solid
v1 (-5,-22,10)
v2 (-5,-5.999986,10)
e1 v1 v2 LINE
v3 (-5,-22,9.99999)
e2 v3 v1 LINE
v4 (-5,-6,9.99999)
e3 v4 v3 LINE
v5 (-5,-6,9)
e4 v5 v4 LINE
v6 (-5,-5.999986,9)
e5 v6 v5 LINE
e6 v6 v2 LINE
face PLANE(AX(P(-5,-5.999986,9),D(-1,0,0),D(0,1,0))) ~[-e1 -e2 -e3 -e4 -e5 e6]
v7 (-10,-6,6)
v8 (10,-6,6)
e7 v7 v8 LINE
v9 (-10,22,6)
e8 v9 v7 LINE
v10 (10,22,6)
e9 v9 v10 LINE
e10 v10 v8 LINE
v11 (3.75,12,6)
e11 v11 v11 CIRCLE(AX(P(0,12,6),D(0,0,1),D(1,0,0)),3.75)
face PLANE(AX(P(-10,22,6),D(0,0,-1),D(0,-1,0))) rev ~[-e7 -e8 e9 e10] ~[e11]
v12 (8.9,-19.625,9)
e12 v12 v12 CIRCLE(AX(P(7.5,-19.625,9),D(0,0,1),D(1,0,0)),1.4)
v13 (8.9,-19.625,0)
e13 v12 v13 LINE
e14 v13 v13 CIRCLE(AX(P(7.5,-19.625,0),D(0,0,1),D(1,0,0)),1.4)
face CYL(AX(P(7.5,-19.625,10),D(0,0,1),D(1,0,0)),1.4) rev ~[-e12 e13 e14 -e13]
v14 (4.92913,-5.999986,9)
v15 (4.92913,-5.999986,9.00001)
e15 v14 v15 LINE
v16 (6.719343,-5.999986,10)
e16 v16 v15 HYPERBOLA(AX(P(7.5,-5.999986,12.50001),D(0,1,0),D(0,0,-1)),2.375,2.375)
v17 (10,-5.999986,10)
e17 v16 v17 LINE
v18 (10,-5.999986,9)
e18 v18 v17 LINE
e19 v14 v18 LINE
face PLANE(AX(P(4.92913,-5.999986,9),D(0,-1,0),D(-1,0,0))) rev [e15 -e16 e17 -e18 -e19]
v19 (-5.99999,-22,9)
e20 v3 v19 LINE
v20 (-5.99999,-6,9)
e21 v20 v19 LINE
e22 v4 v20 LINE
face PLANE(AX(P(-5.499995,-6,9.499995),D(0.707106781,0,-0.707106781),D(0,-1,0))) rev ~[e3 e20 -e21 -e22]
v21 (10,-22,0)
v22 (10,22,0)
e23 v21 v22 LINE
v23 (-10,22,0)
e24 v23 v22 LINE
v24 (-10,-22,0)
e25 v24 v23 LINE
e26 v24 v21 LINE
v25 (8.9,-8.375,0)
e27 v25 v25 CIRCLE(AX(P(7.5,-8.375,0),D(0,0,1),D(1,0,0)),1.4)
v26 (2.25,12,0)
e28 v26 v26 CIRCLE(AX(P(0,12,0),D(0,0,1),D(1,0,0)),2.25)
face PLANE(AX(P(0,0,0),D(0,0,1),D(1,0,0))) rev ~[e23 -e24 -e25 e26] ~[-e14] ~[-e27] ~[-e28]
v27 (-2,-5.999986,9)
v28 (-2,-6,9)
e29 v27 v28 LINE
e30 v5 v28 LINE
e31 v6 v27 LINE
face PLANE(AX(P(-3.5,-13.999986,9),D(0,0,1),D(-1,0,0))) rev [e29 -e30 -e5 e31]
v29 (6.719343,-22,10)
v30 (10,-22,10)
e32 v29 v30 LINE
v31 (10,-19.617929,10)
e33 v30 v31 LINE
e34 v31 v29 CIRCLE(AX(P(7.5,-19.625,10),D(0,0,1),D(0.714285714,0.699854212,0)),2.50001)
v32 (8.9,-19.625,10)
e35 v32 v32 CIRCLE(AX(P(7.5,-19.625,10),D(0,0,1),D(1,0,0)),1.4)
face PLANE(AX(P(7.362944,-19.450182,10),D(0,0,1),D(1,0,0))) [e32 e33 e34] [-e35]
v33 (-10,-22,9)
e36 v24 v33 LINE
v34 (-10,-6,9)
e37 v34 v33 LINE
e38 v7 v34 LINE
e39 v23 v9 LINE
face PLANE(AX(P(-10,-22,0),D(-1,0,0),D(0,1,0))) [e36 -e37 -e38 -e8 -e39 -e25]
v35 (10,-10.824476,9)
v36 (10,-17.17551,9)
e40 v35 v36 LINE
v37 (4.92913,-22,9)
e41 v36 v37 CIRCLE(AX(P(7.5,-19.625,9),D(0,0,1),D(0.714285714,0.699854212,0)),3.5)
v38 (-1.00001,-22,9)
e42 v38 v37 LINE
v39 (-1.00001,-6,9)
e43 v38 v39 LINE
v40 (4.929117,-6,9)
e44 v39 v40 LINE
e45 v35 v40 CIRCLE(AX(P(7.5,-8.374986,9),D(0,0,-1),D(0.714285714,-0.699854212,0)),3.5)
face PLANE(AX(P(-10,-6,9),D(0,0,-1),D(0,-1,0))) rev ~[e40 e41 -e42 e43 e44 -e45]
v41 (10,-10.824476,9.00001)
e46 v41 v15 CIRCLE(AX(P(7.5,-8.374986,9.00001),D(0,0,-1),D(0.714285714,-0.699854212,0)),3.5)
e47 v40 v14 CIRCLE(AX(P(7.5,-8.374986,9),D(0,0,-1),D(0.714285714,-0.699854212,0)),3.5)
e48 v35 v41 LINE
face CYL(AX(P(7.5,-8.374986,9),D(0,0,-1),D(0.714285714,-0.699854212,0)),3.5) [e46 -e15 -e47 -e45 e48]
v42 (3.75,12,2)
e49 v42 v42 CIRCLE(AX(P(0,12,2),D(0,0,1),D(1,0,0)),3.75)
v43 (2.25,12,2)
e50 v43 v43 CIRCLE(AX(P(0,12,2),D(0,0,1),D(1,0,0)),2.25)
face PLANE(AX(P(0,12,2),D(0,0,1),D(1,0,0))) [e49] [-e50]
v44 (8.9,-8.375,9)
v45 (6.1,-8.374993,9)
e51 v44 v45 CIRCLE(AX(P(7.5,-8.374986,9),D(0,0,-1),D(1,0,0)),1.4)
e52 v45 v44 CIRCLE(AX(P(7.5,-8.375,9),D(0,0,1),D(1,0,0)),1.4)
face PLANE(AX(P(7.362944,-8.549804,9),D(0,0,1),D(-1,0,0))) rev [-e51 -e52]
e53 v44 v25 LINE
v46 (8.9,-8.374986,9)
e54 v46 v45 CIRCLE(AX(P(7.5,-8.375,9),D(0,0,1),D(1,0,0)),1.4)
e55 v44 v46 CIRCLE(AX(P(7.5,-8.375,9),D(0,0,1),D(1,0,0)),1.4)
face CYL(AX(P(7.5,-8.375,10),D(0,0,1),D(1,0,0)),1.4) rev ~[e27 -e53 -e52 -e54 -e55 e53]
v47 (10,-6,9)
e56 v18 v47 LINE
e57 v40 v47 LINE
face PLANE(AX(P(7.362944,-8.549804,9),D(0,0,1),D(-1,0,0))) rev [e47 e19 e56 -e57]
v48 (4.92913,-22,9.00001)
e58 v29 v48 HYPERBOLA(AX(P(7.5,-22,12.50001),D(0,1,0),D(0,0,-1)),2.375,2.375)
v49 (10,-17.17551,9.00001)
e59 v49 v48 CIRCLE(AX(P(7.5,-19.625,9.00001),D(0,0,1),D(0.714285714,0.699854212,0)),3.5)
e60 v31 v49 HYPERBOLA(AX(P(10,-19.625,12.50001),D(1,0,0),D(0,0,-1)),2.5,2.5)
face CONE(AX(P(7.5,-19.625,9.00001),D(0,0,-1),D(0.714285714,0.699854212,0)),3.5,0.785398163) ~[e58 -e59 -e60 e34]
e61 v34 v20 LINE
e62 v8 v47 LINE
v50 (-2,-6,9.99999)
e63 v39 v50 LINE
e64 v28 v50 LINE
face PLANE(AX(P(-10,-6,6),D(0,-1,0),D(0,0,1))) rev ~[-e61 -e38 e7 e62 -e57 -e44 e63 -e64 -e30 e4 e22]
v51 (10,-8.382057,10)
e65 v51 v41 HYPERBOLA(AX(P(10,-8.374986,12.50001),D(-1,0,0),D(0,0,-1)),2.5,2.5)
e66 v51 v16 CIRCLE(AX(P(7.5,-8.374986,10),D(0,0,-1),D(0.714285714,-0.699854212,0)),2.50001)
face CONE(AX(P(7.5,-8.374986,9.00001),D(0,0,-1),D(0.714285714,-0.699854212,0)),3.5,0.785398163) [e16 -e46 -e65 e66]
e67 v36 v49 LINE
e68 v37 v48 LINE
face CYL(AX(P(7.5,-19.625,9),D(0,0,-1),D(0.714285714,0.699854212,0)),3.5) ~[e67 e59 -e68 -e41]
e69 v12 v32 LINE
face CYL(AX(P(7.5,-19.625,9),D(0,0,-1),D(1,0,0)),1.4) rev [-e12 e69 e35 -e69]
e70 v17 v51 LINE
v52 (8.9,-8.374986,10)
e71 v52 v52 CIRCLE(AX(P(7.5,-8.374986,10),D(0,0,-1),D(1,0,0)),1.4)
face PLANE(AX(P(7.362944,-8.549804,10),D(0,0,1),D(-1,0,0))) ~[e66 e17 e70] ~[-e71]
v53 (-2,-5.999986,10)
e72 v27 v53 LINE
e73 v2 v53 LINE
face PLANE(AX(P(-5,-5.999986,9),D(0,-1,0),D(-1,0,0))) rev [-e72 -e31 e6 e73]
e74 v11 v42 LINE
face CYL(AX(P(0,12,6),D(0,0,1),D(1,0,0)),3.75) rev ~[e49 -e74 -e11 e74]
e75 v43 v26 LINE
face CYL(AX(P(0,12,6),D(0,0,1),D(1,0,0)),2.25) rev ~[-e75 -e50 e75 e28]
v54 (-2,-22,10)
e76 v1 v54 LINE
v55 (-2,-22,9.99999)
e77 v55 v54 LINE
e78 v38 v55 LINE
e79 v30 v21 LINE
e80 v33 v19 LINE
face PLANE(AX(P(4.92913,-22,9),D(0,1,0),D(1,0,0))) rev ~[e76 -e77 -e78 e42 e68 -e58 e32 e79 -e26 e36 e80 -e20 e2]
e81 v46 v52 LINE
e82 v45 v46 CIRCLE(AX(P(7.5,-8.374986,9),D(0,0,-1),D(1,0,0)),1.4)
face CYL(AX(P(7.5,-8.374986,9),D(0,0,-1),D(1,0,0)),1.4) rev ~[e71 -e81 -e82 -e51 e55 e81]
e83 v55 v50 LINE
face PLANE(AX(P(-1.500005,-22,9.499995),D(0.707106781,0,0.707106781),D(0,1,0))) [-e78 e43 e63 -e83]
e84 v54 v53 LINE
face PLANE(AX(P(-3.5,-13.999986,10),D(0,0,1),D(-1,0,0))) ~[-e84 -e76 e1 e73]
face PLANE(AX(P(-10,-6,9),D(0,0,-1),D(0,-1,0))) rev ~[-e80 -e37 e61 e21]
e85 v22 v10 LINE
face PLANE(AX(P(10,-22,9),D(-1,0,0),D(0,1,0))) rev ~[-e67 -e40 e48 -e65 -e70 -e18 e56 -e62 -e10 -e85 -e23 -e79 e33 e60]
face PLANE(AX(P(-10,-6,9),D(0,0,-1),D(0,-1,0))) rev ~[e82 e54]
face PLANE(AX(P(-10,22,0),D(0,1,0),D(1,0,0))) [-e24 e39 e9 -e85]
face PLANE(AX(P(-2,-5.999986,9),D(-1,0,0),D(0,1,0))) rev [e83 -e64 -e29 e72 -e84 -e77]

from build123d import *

# Parameters (mm, degrees)
F0_W      = 20
F0_H      = 44
F1_DEPTH  = 10
F2_R      = 1.4
F3_DEPTH  = 10.001
F5_DEPTH  = 20.001
F6_R      = 2.25
F7_DEPTH  = 6.001
F8_R      = 3.75
F9_DEPTH  = 4
F10_W     = 3
F10_H     = 16
F10_R     = 1.4
F11_DEPTH = 1
F12_SIZE  = 0.99999


# Not quite as in the source:
# - a fillet or chamfer is up to 0.001 mm smaller than in the source, because OpenCascade refuses the exact size
# - a pattern or mirror of a feature is missing from the dataset's text; its kind, count and spacing are read off the source's solid


with BuildPart() as f1:
    # F0 (on Top) → F1 (new body)
    with BuildSketch(Plane.XY):
        Rectangle(F0_W, F0_H)
    extrude(amount=F1_DEPTH)

    # F2 (on face) → F3 (cut, through all)
    with BuildSketch(Plane.XY.offset(10)):
        with Locations((7.5, -19.625)):
            Circle(F2_R)
        with Locations((7.5, -8.375)):
            Circle(F2_R)
    extrude(amount=-F3_DEPTH, mode=Mode.SUBTRACT)

    # F4 (on face) → F5 (cut, through all)
    with BuildSketch(Plane(origin=(-10, 0, 0), x_dir=(0, -1, 0), z_dir=(-1, 0, 0))):
        Polygon((6, 9), (22, 9), (22, 10), (-22, 10), (-22, 6), (6, 6), align=None)
    extrude(amount=-F5_DEPTH, mode=Mode.SUBTRACT)

    # F6 (on face) → F7 (cut, through all)
    with BuildSketch(Plane.XY.offset(6)):
        with Locations((0, 12)):
            Circle(F6_R)
    extrude(amount=-F7_DEPTH, mode=Mode.SUBTRACT)

    # F8 (on face) → F9 (cut)
    with BuildSketch(Plane.XY.offset(6)):
        with Locations((0, 12)):
            Circle(F8_R)
    extrude(amount=-F9_DEPTH, mode=Mode.SUBTRACT)

    # F10 (on face) → F11 (join)
    with BuildSketch(Plane.XY.offset(9)):
        with Locations((-3.5, -14)):
            Rectangle(F10_W, F10_H)
        with BuildLine():
            Line((10, -22), (10, -17.1755102572))
            ThreePointArc((10, -17.1755102572), (5.0874948755, -17.0892912185), (4.9291295248, -22))
            Line((4.9291295248, -22), (10, -22))
        make_face()
        with Locations((7.5, -19.625)):
            Circle(F10_R, mode=Mode.SUBTRACT)
    f11 = extrude(amount=F11_DEPTH)

    # F11_copies: F11 across plane
    add(f11.mirror(Plane(origin=(-6e-06, -13.999993, 0), x_dir=(0, 0, 1), z_dir=(0, 1, 0))))

    # F12 (size 1 in the source; OpenCascade refuses exactly that, so slightly less here)
    f12_edges = [f1.edges().sort_by_distance(p)[0] for p in [
        (5.087495, -10.910695, 10),
        (5.087495, -17.089291, 10),
        (-5, -14, 9),
        (-2, -14, 9),
    ]]
    chamfer(f12_edges, length=F12_SIZE)


solid = f1.part
